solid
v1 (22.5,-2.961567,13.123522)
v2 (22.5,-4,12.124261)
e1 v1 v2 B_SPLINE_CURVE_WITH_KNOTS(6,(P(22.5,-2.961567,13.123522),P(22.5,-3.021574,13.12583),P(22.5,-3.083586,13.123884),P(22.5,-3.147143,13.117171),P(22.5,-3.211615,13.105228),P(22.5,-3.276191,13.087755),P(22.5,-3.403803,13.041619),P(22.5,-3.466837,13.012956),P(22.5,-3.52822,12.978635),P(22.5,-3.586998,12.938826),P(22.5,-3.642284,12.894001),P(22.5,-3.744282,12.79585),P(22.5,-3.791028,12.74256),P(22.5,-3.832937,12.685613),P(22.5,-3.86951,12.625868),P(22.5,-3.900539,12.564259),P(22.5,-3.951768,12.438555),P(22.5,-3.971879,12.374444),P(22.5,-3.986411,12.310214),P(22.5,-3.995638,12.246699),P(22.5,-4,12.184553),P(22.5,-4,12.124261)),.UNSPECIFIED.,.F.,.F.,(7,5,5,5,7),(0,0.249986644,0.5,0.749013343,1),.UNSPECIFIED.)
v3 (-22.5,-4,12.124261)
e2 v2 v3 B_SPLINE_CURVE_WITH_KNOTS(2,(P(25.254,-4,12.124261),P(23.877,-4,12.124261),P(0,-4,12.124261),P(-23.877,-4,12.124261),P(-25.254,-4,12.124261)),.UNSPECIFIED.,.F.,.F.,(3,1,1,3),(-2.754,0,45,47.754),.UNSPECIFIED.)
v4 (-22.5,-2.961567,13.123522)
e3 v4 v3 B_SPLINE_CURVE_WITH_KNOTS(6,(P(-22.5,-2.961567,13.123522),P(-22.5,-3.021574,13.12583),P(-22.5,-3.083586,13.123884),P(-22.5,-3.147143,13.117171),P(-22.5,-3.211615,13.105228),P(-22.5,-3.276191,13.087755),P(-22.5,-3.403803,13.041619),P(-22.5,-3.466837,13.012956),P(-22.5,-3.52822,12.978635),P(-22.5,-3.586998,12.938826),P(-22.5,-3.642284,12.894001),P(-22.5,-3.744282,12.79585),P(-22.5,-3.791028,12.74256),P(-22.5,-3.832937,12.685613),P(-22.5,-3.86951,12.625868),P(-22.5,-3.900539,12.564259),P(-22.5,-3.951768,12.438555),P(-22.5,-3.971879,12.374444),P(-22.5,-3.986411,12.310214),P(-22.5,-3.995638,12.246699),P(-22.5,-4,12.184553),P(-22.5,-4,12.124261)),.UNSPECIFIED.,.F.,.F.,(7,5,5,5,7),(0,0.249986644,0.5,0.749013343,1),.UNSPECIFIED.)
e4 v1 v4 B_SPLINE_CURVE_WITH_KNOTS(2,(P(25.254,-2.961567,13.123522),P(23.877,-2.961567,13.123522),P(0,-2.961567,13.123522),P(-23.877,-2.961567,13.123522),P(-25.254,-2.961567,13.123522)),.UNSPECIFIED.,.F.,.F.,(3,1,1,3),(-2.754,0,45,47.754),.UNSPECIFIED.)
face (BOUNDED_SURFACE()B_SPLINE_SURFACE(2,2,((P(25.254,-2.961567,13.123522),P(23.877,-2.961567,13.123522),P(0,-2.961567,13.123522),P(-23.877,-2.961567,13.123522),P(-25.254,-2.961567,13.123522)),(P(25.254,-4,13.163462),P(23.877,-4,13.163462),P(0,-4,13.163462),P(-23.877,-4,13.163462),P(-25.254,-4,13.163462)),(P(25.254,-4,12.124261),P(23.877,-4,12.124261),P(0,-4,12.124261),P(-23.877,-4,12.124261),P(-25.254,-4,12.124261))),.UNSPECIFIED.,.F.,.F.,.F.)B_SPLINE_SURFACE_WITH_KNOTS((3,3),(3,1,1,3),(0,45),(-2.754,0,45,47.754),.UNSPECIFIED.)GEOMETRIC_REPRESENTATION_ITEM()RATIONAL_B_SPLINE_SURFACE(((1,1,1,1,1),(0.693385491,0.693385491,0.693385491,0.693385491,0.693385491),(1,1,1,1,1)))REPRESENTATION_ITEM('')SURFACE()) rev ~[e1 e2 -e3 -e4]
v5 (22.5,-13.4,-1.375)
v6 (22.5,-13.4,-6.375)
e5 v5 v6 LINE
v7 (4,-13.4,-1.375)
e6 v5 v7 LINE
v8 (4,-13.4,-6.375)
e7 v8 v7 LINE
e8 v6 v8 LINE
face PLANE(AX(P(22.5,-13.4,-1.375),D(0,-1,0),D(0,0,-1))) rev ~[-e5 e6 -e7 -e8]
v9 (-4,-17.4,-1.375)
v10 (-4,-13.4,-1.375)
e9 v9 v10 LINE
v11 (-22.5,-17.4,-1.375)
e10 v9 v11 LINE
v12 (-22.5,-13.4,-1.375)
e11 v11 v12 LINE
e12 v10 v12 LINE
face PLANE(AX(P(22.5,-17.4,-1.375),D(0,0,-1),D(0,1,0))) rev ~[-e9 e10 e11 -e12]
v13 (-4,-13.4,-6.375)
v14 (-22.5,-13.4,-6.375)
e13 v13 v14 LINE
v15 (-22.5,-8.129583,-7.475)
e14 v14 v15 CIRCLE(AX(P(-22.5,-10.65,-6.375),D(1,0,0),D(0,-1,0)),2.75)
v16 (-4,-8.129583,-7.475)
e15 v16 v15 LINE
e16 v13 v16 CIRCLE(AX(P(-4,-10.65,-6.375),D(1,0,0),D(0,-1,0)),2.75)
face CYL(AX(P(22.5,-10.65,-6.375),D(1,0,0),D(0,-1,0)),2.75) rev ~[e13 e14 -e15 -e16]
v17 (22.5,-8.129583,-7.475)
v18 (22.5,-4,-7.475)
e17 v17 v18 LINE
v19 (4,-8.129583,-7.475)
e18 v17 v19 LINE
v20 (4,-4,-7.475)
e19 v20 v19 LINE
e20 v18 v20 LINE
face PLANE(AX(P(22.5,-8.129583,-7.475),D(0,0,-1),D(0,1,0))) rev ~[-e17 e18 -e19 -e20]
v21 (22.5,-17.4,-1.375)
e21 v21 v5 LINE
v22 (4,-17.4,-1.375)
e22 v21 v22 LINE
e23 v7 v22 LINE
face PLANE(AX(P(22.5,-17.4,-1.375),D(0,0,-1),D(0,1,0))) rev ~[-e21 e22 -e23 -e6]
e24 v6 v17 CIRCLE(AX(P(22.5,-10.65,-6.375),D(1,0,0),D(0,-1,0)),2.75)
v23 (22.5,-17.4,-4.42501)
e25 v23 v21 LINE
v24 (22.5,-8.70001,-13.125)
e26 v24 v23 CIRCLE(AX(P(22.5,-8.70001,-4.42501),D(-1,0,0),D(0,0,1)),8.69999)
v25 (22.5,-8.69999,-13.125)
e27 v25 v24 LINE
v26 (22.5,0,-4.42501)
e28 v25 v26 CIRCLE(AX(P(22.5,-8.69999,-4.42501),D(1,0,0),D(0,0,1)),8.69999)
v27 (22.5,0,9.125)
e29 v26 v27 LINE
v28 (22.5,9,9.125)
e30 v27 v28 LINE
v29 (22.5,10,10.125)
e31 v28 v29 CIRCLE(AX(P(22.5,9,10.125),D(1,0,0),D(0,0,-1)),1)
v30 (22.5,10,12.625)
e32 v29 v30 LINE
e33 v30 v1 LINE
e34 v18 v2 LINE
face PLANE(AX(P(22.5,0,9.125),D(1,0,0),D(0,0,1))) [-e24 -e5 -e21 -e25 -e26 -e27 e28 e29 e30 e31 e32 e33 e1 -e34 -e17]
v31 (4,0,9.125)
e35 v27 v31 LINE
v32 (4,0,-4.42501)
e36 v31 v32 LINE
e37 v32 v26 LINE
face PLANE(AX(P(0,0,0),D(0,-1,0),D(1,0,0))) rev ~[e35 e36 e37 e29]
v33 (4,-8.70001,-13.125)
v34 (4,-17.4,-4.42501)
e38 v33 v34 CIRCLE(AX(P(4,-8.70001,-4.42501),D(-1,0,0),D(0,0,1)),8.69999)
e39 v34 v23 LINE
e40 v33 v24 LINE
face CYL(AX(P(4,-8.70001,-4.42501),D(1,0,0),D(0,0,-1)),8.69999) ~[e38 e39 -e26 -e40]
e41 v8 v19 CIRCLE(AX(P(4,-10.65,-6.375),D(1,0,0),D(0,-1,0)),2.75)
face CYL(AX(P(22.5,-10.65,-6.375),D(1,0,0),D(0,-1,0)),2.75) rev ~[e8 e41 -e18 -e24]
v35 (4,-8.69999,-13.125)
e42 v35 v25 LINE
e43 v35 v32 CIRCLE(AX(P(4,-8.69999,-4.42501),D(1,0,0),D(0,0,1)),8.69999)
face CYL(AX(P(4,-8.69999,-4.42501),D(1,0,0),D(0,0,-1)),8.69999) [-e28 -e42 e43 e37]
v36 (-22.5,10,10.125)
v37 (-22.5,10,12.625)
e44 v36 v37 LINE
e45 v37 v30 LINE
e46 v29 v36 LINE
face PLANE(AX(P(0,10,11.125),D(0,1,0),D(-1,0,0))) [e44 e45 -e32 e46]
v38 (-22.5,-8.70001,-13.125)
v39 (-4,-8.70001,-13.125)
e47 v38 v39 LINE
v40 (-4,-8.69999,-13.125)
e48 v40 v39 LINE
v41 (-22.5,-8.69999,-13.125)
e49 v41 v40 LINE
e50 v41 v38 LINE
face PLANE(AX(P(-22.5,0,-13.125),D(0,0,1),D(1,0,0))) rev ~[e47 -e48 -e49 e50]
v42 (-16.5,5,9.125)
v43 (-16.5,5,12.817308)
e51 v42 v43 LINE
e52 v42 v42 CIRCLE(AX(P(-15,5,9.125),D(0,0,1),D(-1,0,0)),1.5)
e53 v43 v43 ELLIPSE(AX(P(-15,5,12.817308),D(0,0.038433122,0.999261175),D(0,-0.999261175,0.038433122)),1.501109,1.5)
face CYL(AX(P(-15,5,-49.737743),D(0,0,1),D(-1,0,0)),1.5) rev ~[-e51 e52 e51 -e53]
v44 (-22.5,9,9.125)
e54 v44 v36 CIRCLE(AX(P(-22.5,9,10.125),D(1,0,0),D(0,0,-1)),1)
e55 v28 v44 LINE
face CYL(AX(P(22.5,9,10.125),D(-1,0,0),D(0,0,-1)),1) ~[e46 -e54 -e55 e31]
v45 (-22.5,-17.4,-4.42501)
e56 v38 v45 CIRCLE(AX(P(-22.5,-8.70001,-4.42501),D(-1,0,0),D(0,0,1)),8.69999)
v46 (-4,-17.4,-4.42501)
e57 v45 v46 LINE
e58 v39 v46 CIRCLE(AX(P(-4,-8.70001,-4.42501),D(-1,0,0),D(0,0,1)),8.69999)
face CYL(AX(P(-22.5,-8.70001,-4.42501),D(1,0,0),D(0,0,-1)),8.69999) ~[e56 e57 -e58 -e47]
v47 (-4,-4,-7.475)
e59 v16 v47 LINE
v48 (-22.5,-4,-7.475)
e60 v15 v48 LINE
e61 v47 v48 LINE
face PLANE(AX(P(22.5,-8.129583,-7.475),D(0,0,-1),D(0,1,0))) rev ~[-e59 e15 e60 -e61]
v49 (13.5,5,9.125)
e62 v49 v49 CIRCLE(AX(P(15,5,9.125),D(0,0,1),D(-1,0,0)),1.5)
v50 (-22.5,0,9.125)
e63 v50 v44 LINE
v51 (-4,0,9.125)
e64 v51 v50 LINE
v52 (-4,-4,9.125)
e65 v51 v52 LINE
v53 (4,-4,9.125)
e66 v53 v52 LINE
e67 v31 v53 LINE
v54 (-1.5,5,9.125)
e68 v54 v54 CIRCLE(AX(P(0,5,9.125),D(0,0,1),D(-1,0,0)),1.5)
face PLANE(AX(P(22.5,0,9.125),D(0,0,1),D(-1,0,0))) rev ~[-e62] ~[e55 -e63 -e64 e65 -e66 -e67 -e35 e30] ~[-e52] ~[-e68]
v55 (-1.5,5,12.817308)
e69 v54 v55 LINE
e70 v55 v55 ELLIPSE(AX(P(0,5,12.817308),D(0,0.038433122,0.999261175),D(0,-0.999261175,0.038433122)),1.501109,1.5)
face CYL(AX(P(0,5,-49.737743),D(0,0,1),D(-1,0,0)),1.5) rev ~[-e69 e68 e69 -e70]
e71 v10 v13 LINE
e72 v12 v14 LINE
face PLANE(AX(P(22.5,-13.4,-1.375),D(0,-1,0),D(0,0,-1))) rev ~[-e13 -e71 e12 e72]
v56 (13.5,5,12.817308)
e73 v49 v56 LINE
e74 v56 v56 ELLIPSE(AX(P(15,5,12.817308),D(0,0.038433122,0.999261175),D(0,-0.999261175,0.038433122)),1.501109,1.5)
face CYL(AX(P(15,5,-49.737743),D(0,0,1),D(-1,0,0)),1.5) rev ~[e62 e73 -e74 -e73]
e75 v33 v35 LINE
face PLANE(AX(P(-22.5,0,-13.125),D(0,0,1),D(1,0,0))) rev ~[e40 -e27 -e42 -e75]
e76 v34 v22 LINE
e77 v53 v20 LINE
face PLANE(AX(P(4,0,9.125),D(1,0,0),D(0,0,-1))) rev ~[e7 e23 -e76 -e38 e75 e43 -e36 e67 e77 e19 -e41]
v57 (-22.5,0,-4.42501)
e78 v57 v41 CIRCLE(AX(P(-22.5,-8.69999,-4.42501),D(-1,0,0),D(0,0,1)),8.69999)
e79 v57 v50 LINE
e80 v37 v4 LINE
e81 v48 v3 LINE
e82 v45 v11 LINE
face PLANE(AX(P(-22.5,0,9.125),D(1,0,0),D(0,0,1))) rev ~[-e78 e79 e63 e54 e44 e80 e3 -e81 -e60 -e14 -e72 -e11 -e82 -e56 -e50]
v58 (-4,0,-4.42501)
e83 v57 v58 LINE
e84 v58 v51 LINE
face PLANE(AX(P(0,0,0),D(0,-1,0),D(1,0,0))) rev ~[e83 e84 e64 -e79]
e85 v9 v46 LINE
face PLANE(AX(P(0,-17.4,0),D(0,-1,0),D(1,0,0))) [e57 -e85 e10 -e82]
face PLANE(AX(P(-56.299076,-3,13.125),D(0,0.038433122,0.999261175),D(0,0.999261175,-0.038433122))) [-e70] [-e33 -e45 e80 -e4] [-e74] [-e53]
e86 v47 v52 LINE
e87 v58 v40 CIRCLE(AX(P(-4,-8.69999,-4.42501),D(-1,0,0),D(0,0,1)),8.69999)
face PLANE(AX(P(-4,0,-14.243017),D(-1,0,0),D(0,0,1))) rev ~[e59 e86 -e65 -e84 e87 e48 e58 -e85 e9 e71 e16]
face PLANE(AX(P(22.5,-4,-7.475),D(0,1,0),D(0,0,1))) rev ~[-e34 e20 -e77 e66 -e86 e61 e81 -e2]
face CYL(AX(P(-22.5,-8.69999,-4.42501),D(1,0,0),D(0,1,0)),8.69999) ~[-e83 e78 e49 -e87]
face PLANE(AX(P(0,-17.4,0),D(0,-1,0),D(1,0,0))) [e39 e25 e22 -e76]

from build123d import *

# Parameters (mm, degrees)
F0_W        = 45
F0_H        = 26.25
F1_DEPTH    = 17.4
F2_W        = 45
F2_H        = 4
F3_DEPTH    = 10
F5_DEPTH    = 45
F7_D        = 3
F8_T1_DEPTH = 112.5981529113
F9_W        = 8
F9_H        = 22.25
F9_H_2      = 1.1180170857
F10_DEPTH   = 21.5
F11_R       = 8.69999
F12_R       = 1


# Not quite as in the source:
# - a fillet or chamfer that OpenCascade refuses, or shapes differently, is made with other operations: its cross-section is extruded or revolved along the edge and cut away or added
# - a fillet or chamfer is up to 0.001 mm smaller than in the source, because OpenCascade refuses the exact size


with BuildPart() as f1:
    # F0 (on Front) → F1 (new body)
    with BuildSketch(Plane.XZ):
        Rectangle(F0_W, F0_H)
    extrude(amount=F1_DEPTH)

    # F2 (on face) → F3 (join)
    with BuildSketch(Plane(origin=(0, 0, 0), x_dir=(-1, 0, 0), z_dir=(0, 1, 0))):
        with Locations((0, 11.125)):
            Rectangle(F2_W, F2_H)
    extrude(amount=F3_DEPTH)

    # F4 (on face) → F5 (cut)
    with BuildSketch(Plane.YZ.offset(22.5)):
        with BuildLine():
            Line((-13.4, -1.375), (-13.4, -6.375))
            ThreePointArc((-13.4, -6.375), (-11.2118515201, -9.0669923606), (-8.1295833678, -7.475))
            Line((-8.1295833678, -7.475), (-4.5024615599, -7.475))
            Line((-4.5024615599, -7.475), (-4, -7.475))
            Line((-4, -7.475), (-4, 13.125))
            Line((-4, 13.125), (-17.4, 13.125))
            Line((-17.4, 13.125), (-17.4, -1.375))
            Line((-17.4, -1.375), (-13.4, -1.375))
        make_face()
    extrude(amount=-F5_DEPTH, mode=Mode.SUBTRACT)

    # F7 (through all)
    with Locations(Plane(origin=(0, 0, 9.125), x_dir=(1, 0, 0), z_dir=(0, 0, -1))):
        with Locations((-15, -5), (0, -5), (15, -5)):
            Hole(F7_D / 2)

    # F8: chamfer of 13 x 0.5 on 1 edges, made by hand

    # F8_s2 → F8_t1 (cut)
    with BuildSketch(Plane.YZ.offset(-56.2990764557)):
        Polygon((-3, 13.125), (10, 12.625), (10, 13.125), align=None)
    extrude(amount=F8_T1_DEPTH, mode=Mode.SUBTRACT)

    # F9 (on face) → F10 (cut)
    with BuildSketch(Plane(origin=(0, 0, 0), x_dir=(-1, 0, 0), z_dir=(0, 1, 0))):
        with Locations((0, -2)):
            Rectangle(F9_W, F9_H)
        with Locations((0, -13.6840085428)):
            Rectangle(F9_W, F9_H_2)
    extrude(amount=-F10_DEPTH, mode=Mode.SUBTRACT)

    # F11 (radius 8.7 in the source; OpenCascade refuses exactly that, so slightly less here)
    f11_edges = [f1.edges().sort_by_distance(p)[0] for p in [
        (-13.25, -17.4, -13.125),
        (-13.25, 0, -13.125),
        (13.25, -17.4, -13.125),
        (13.25, 0, -13.125),
    ]]
    fillet(f11_edges, radius=F11_R)

    # F12
    f12_edges = [f1.edges().sort_by_distance(p)[0] for p in [
        (0, 10, 9.125),
        (0, -4, 13.125),
    ]]
    fillet(f12_edges, radius=F12_R)


solid = f1.part
